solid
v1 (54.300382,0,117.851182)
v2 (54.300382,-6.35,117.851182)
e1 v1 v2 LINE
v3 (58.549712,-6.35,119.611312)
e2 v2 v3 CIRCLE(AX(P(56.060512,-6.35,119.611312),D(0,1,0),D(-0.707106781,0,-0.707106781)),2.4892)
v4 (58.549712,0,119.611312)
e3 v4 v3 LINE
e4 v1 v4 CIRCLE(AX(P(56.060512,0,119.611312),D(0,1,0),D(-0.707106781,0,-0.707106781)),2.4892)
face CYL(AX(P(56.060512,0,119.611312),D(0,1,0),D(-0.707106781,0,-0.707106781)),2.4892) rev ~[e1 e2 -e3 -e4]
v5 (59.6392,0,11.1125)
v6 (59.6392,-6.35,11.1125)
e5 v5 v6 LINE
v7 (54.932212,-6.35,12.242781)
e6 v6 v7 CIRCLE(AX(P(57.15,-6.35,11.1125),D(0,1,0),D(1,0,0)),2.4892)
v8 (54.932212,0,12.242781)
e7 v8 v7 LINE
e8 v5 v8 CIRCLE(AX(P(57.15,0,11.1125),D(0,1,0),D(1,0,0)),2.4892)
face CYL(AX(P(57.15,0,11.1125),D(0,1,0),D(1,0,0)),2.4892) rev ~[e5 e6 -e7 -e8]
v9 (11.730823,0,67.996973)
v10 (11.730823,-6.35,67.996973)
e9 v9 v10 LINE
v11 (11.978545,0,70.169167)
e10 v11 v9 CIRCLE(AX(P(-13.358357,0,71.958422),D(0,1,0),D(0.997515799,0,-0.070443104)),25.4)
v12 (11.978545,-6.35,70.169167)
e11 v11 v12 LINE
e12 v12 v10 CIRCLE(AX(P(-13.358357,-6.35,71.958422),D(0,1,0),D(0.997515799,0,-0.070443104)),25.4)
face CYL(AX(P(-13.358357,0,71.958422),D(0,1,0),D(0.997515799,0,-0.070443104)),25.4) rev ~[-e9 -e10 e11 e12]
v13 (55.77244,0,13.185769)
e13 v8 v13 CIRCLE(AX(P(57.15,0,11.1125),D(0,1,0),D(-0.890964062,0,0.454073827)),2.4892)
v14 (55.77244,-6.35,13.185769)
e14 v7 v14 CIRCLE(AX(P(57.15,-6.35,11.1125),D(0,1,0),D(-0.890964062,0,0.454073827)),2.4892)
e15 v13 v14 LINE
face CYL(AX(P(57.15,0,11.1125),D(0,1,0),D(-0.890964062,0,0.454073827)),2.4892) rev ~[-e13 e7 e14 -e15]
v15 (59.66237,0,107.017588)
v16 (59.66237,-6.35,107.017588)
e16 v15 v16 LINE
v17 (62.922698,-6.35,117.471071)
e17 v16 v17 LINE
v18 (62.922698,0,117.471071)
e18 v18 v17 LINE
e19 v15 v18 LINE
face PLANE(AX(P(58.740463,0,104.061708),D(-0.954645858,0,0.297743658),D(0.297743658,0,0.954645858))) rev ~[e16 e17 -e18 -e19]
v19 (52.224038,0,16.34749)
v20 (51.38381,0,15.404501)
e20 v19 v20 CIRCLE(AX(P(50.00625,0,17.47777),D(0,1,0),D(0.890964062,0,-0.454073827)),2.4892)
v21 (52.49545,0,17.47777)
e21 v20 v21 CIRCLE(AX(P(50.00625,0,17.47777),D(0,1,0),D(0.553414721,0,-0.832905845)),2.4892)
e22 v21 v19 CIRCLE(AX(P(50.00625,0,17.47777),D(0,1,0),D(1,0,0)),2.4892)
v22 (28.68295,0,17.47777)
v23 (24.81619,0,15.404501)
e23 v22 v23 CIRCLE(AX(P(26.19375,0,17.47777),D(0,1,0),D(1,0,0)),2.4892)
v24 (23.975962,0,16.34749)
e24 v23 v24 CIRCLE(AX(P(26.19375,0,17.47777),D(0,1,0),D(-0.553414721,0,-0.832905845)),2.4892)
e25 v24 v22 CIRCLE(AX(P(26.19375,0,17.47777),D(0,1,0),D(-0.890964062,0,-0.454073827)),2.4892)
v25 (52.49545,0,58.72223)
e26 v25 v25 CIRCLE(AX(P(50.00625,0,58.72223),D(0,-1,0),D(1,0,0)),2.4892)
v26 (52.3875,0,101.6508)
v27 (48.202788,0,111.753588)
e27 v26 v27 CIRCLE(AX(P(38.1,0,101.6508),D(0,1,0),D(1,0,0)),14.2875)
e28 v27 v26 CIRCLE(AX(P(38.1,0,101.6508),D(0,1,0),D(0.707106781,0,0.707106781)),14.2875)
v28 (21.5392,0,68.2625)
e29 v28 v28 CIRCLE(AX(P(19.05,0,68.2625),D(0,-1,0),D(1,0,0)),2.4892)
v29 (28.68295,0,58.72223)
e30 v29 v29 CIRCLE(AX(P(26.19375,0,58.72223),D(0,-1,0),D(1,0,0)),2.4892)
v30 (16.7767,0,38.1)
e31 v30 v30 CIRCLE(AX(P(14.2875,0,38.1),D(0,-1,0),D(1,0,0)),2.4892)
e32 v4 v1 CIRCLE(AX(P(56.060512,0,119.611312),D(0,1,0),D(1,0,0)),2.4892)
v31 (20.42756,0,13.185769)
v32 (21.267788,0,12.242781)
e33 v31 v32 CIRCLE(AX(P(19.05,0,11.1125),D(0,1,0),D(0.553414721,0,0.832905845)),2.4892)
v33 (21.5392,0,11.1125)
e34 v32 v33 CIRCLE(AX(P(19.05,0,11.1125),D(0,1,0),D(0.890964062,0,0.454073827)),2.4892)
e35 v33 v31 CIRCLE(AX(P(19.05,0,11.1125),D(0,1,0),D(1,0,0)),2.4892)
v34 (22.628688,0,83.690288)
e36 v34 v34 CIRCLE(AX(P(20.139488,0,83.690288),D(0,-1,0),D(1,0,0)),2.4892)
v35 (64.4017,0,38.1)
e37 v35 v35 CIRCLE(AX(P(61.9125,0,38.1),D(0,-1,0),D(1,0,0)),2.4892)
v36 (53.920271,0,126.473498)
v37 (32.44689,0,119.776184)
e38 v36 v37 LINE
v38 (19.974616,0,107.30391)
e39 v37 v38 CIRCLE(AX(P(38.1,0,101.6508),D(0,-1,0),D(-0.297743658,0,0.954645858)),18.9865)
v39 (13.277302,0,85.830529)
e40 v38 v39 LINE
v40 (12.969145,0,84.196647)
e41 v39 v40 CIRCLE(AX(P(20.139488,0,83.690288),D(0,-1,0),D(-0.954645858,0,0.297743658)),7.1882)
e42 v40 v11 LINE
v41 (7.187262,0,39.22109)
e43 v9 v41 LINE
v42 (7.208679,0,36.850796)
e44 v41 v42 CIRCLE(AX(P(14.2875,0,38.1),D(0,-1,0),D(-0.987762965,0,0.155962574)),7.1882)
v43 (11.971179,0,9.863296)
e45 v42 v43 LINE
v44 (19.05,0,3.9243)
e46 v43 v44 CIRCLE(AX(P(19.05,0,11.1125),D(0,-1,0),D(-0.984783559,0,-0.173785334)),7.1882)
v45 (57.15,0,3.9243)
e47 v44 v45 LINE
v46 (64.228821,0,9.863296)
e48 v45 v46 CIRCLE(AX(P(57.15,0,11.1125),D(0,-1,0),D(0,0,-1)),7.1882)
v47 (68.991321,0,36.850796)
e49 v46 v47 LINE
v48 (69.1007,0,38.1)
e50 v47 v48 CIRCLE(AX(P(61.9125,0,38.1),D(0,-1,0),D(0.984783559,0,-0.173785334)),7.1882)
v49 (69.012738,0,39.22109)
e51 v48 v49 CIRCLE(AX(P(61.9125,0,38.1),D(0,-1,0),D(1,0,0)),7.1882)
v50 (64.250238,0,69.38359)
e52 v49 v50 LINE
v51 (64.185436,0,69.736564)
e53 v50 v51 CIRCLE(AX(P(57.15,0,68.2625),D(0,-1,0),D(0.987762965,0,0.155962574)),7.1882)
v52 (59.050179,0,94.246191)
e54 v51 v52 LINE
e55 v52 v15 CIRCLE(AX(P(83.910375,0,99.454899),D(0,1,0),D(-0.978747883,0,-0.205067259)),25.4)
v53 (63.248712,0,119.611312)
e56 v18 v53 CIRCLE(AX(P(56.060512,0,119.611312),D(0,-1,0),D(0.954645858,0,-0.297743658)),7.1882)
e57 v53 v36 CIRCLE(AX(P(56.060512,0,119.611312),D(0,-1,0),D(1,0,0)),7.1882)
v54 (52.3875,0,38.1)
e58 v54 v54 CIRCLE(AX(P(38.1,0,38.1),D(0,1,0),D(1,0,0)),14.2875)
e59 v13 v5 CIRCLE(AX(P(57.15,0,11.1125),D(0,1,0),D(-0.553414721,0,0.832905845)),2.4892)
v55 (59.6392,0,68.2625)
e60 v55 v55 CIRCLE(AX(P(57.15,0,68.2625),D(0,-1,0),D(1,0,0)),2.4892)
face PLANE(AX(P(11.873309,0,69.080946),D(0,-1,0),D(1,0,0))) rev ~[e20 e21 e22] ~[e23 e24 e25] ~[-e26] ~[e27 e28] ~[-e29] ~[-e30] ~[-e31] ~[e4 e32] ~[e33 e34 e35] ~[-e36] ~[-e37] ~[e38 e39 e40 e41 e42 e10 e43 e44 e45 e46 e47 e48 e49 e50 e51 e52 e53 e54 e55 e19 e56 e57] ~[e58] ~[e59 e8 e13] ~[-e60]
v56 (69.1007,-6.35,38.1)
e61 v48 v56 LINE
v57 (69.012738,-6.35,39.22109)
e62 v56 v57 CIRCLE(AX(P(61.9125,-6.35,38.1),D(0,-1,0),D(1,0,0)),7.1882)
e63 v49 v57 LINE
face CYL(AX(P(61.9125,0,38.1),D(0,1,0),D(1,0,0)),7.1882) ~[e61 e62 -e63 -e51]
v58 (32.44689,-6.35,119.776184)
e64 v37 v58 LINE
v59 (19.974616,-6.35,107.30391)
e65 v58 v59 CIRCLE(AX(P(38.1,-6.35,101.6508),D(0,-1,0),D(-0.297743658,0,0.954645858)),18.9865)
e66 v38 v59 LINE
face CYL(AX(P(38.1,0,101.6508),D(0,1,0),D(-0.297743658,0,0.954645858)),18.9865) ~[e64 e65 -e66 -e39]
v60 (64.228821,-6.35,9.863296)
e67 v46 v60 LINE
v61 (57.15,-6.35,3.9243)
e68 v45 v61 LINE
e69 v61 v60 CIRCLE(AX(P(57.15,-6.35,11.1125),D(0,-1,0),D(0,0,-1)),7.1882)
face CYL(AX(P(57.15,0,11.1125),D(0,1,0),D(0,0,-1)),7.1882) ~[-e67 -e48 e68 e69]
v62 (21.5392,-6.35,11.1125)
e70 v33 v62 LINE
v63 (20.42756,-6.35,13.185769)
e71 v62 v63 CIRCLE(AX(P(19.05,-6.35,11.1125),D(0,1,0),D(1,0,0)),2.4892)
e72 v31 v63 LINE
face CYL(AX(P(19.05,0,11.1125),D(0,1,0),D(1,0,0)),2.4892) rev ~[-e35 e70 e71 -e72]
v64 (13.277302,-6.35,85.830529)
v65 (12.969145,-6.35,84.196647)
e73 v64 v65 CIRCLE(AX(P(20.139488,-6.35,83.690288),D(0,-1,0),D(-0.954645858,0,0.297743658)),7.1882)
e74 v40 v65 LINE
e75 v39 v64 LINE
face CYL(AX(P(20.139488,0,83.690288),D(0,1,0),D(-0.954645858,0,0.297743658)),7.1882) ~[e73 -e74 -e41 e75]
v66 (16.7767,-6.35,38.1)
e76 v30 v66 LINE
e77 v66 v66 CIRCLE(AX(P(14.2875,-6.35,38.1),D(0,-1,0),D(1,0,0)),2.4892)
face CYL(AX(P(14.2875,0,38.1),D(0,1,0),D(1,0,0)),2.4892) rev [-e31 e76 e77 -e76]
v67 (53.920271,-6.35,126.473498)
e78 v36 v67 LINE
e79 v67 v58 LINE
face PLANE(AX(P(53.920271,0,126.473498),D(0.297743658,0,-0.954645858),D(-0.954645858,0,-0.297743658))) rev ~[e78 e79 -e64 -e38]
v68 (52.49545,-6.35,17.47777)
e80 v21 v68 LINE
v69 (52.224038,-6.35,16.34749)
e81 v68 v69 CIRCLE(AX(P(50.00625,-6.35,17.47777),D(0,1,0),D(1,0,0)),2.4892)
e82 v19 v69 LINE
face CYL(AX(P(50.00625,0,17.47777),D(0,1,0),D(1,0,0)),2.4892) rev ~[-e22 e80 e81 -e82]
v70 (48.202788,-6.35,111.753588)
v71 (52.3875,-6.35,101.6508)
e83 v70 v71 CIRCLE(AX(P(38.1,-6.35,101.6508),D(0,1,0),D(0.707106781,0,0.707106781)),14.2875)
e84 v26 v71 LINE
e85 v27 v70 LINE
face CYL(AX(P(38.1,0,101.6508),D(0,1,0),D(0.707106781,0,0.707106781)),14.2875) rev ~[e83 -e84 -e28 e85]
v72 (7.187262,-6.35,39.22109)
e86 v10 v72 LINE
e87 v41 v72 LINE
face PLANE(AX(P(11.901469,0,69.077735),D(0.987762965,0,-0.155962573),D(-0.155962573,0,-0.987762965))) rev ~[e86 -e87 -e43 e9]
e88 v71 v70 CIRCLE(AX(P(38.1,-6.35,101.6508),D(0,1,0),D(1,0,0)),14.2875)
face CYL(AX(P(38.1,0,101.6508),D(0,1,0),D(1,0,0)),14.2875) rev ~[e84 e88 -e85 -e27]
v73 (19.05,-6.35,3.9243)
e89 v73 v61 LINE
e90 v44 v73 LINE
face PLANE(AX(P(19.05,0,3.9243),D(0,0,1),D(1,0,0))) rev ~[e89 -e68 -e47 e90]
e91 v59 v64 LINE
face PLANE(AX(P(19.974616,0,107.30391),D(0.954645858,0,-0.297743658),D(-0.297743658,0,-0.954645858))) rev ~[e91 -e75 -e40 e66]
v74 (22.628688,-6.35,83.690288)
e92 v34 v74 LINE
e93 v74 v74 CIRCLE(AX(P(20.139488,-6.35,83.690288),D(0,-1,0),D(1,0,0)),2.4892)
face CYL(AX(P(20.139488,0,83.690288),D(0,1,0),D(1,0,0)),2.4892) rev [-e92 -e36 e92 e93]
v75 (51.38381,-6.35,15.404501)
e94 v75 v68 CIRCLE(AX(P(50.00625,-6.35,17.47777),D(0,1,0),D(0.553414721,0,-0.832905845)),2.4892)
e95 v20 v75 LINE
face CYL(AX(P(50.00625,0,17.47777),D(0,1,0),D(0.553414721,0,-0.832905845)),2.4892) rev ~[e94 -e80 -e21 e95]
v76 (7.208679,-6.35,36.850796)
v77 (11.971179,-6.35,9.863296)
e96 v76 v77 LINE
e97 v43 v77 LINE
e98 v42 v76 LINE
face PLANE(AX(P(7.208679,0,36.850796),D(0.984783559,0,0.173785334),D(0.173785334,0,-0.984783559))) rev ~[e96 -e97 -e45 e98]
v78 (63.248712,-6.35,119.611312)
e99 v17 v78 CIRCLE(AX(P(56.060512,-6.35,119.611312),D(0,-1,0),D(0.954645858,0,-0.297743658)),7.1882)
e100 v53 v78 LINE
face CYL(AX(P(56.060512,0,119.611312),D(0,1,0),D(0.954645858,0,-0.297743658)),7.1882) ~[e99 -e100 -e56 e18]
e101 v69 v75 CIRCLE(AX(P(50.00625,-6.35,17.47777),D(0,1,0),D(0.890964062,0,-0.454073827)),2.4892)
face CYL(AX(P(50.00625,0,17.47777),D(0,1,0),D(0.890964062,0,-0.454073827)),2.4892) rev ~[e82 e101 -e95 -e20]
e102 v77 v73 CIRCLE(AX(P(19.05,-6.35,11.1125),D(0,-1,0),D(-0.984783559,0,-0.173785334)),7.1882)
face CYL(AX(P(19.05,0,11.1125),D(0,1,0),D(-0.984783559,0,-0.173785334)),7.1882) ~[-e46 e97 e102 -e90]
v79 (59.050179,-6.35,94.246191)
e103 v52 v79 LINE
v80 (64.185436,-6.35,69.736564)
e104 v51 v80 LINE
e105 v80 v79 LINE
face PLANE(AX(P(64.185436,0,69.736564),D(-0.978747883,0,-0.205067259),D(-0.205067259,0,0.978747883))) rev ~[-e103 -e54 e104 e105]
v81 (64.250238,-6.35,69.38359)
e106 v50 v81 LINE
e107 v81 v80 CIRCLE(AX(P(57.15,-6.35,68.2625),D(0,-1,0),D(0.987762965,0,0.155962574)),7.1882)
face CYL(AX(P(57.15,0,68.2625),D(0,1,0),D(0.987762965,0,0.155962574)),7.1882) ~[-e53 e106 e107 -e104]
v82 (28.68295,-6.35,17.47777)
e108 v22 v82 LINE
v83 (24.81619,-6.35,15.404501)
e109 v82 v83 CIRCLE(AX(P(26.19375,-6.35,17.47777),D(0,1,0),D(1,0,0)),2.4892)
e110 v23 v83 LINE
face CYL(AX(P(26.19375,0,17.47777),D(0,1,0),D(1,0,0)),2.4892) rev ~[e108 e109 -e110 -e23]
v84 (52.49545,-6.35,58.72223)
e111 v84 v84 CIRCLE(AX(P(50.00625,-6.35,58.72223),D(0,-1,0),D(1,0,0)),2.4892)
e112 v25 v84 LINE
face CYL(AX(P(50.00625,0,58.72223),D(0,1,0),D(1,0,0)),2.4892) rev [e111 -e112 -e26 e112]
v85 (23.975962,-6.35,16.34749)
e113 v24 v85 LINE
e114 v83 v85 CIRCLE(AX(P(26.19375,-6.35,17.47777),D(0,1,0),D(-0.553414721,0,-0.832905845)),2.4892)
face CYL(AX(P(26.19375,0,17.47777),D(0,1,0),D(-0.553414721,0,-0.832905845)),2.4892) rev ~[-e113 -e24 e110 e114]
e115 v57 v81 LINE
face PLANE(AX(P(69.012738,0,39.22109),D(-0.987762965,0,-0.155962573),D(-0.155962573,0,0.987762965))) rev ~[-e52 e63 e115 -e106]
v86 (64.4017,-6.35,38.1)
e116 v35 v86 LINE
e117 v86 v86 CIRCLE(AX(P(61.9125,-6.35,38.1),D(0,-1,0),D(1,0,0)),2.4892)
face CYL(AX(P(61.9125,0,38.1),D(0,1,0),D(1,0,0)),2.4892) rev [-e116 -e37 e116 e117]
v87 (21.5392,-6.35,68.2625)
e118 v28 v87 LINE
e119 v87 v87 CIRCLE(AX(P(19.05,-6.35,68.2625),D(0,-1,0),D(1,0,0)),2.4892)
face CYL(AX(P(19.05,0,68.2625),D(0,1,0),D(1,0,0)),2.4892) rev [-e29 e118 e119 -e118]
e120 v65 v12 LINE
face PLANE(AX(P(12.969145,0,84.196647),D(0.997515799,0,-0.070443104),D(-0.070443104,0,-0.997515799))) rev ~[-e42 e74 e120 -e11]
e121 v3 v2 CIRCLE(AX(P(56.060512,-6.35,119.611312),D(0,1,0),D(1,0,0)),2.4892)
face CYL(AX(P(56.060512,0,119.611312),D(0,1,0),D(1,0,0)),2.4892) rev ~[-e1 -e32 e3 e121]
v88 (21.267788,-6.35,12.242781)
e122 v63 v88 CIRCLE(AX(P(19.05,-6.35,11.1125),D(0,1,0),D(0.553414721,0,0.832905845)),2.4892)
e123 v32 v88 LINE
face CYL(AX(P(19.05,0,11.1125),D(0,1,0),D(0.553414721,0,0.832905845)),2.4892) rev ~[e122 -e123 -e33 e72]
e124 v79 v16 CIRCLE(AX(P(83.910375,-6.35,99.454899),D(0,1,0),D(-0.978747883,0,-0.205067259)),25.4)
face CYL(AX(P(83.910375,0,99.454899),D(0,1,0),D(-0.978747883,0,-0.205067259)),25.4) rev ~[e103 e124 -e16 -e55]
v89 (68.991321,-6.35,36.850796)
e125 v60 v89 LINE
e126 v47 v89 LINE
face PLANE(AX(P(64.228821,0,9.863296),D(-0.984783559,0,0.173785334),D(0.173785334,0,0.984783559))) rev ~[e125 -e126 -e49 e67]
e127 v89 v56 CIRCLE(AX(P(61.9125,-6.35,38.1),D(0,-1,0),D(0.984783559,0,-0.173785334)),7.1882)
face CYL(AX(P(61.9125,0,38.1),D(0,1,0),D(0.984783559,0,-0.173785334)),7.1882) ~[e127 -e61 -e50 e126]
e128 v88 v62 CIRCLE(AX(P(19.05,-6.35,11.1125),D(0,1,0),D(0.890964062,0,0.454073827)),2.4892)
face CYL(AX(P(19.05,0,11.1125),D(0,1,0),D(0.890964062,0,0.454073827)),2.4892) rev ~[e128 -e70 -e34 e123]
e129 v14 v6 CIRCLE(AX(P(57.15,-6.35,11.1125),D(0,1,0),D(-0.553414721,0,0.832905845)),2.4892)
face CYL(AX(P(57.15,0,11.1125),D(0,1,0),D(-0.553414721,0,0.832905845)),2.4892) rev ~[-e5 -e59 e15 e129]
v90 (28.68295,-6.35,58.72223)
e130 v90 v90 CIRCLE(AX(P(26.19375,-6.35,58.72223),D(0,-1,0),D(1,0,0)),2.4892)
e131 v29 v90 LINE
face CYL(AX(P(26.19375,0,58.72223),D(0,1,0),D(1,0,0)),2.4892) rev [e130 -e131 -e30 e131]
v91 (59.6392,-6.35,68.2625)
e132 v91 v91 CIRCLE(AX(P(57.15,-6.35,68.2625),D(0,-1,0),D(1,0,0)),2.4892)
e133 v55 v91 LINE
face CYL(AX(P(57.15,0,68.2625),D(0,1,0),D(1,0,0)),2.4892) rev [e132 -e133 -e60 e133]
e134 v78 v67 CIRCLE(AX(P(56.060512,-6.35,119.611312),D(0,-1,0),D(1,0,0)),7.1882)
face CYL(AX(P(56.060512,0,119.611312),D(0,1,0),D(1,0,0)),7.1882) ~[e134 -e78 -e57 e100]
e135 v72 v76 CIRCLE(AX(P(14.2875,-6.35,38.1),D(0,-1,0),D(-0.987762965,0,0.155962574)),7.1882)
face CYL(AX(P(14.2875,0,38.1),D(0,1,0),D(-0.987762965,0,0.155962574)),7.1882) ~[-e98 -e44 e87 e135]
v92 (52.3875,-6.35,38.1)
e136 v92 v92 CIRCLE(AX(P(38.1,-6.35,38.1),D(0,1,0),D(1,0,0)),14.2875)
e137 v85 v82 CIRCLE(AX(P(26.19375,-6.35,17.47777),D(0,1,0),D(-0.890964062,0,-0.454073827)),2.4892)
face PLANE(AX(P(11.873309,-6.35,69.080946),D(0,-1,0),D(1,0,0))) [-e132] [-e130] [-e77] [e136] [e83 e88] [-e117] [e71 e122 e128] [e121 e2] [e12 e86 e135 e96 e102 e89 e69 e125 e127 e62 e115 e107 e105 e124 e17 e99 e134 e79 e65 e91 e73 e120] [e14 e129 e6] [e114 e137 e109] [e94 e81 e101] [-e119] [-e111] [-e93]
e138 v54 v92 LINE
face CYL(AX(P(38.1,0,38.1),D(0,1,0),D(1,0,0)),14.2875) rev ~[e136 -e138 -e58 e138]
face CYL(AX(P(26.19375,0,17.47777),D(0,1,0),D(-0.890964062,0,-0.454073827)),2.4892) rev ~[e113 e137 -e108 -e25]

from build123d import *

# Parameters (mm, degrees)
F0_R        = 2.4892
F1_DEPTH    = 6.35
F2_T1_DEPTH = 6.35


# Not quite as in the source:
# - a fillet or chamfer that OpenCascade refuses, or shapes differently, is made with other operations: its cross-section is extruded or revolved along the edge and cut away or added


with BuildPart() as f1:
    # F0 (on Front) → F1 (new body)
    with BuildSketch(Plane.XZ):
        with BuildLine():
            ThreePointArc((13.2773024021, 85.8305287216), (13.0758232734, 85.0225277103), (12.9691446918, 84.1966468751))
            ThreePointArc((12.9691446918, 84.1966468751), (14.0054035794, 79.9428579011), (17.3172773208, 77.0792857545))
            ThreePointArc((17.3172773208, 77.0792857545), (19.6331286406, 76.5199446918), (22.00460406, 76.7482736107))
            ThreePointArc((22.00460406, 76.7482736107), (25.8437426717, 79.3163084348), (27.3276877579, 83.6902877579))
            ThreePointArc((27.3276877579, 83.6902877579), (27.1946025509, 85.0670863985), (26.8002749154, 86.3929038389))
            ThreePointArc((26.8002749154, 86.3929038389), (24.674517099, 88.225317099), (22.8421038389, 90.3510749154))
            ThreePointArc((22.8421038389, 90.3510749154), (17.0679509095, 90.1892015617), (13.2773024021, 85.8305287216))
        make_face()
        with Locations((20.1394877579, 83.6902877579)):
            Circle(F0_R, mode=Mode.SUBTRACT)
        with BuildLine():
            ThreePointArc((26.8002749154, 86.3929038389), (31.0442064849, 84.0240317164), (35.7505, 82.8102312188))
            ThreePointArc((35.7505, 82.8102312188), (38.1, 82.6643), (40.4495, 82.8102312188))
            ThreePointArc((40.4495, 82.8102312188), (42.9672096901, 83.2987578226), (45.3961113108, 84.1221394126))
            ThreePointArc((45.3961113108, 84.1221394126), (47.5091314901, 85.159728875), (49.4775135291, 86.4508207847))
            ThreePointArc((49.4775135291, 86.4508207847), (52.1419442019, 88.8714813453), (54.3015952543, 91.7515326803))
            Line((54.3015952543, 91.7515326803), (54.0915586422, 101.6508))
            Line((54.0915586422, 101.6508), (52.3875, 101.6508))
            ThreePointArc((52.3875, 101.6508), (24.9000711792, 96.1832104601), (48.2027881362, 111.7535881362))
            Line((48.2027881362, 111.7535881362), (50.9776872776, 114.5284872776))
            ThreePointArc((50.9776872776, 114.5284872776), (50.0693141148, 115.6394406129), (49.3997250846, 116.9086961611))
            ThreePointArc((49.3997250846, 116.9086961611), (41.2664943708, 120.3713901523), (32.4468900339, 119.7761835811))
            ThreePointArc((32.4468900339, 119.7761835811), (24.674517099, 115.076282901), (19.9746164189, 107.3039099661))
            ThreePointArc((19.9746164189, 107.3039099661), (19.3794098477, 98.4843056292), (22.8421038389, 90.3510749154))
            ThreePointArc((22.8421038389, 90.3510749154), (25.2223127224, 88.7731127224), (26.8002749154, 86.3929038389))
        make_face()
        with BuildLine():
            ThreePointArc((22.8421038389, 90.3510749154), (24.674517099, 88.225317099), (26.8002749154, 86.3929038389))
            ThreePointArc((26.8002749154, 86.3929038389), (25.2223127224, 88.7731127224), (22.8421038389, 90.3510749154))
        make_face()
        with BuildLine():
            Line((52.3875, 101.6508), (54.0915586422, 101.6508))
            Line((54.0915586422, 101.6508), (53.8671304252, 112.2283602294))
            ThreePointArc((53.8671304252, 112.2283602294), (53.6167151546, 112.5924055979), (53.3578961611, 112.9505250846))
            ThreePointArc((53.3578961611, 112.9505250846), (52.0886406129, 113.6201141148), (50.9776872776, 114.5284872776))
            Line((50.9776872776, 114.5284872776), (48.2027881362, 111.7535881362))
            ThreePointArc((48.2027881362, 111.7535881362), (51.2999288208, 107.1183895399), (52.3875, 101.6508))
        make_face()
        with BuildLine():
            ThreePointArc((51.525482901, 115.076282901), (50.4965080596, 116.03182118), (49.3997250846, 116.9086961611))
            ThreePointArc((49.3997250846, 116.9086961611), (50.0693141148, 115.6394406129), (50.9776872776, 114.5284872776))
            Line((50.9776872776, 114.5284872776), (51.525482901, 115.076282901))
        make_face()
        with BuildLine():
            ThreePointArc((53.3578961611, 112.9505250846), (52.48102118, 114.0473080596), (51.525482901, 115.076282901))
            Line((51.525482901, 115.076282901), (50.9776872776, 114.5284872776))
            ThreePointArc((50.9776872776, 114.5284872776), (52.0886406129, 113.6201141148), (53.3578961611, 112.9505250846))
        make_face()
        with BuildLine():
            ThreePointArc((53.9202712784, 126.4734975979), (49.5615984383, 122.6828490905), (49.3997250846, 116.9086961611))
            ThreePointArc((49.3997250846, 116.9086961611), (50.4965080596, 116.03182118), (51.525482901, 115.076282901))
            ThreePointArc((51.525482901, 115.076282901), (52.48102118, 114.0473080596), (53.3578961611, 112.9505250846))
            ThreePointArc((53.3578961611, 112.9505250846), (53.6051045993, 112.8554856793), (53.8556463568, 112.7696175933))
            ThreePointArc((53.8556463568, 112.7696175933), (56.2129927647, 112.4247296795), (58.5535890214, 112.8692956734))
            ThreePointArc((58.5535890214, 112.8692956734), (61.2734113476, 114.6619787359), (62.9226975979, 117.4710712784))
            ThreePointArc((62.9226975979, 117.4710712784), (63.1667412004, 118.5288478165), (63.2487122421, 119.6113122421))
            ThreePointArc((63.2487122421, 119.6113122421), (60.3199569914, 125.401592863), (53.9202712784, 126.4734975979))
        make_face()
        with BuildLine():
            ThreePointArc((58.5497122421, 119.6113122421), (57.013087842, 117.3115913098), (54.3003820424, 117.8511820424))
            ThreePointArc((54.3003820424, 117.8511820424), (55.1079366423, 121.9110331745), (58.5497122421, 119.6113122421))
        make_face(mode=Mode.SUBTRACT)
        with BuildLine():
            ThreePointArc((22.00460406, 76.7482736107), (19.6331286406, 76.5199446918), (17.3172773208, 77.0792857545))
            Line((17.3172773208, 77.0792857545), (17.1848836978, 75.2045141472))
            ThreePointArc((17.1848836978, 75.2045141472), (19.5563591172, 75.432843066), (21.8722104371, 74.8735020034))
            Line((21.8722104371, 74.8735020034), (22.00460406, 76.7482736107))
        make_face()
        with BuildLine():
            ThreePointArc((11.879656934, 68.7688591172), (12.7603214041, 64.7825341381), (15.6697372294, 61.918680737))
            ThreePointArc((15.6697372294, 61.918680737), (17.4803795527, 61.2477647312), (19.4042866258, 61.0830362159))
            ThreePointArc((19.4042866258, 61.0830362159), (21.8852518822, 64.4761036844), (25.8394633742, 65.9016937117))
            ThreePointArc((25.8394633742, 65.9016937117), (26.1378148913, 67.0653787418), (26.2382, 68.2625))
            ThreePointArc((26.2382, 68.2625), (25.0482010763, 72.2237880592), (21.8722104371, 74.8735020034))
            ThreePointArc((21.8722104371, 74.8735020034), (19.5563591172, 75.432843066), (17.1848836978, 75.2045141472))
            ThreePointArc((17.1848836978, 75.2045141472), (13.7053594795, 73.0692699078), (11.9497622526, 69.3835901706))
            ThreePointArc((11.9497622526, 69.3835901706), (11.9080924989, 69.0769792723), (11.879656934, 68.7688591172))
        make_face()
        with Locations((19.05, 68.2625)):
            Circle(F0_R, mode=Mode.SUBTRACT)
        with BuildLine():
            ThreePointArc((19.4042866258, 61.0830362159), (19.8593939728, 61.1200143937), (20.3112354035, 61.1858126043))
            ThreePointArc((20.3112354035, 61.1858126043), (23.7151175073, 62.7937800508), (25.8394633742, 65.9016937117))
            ThreePointArc((25.8394633742, 65.9016937117), (21.8852518822, 64.4761036844), (19.4042866258, 61.0830362159))
        make_face()
        with BuildLine():
            ThreePointArc((19.5061186901, 56.0867400864), (21.5959350231, 53.1968053577), (24.8175418269, 51.6669999311))
            ThreePointArc((24.8175418269, 51.6669999311), (28.60675, 54.542791329), (32.9918624931, 56.3864461682))
            ThreePointArc((32.9918624931, 56.3864461682), (33.2837574564, 57.5381634141), (33.38195, 58.7222299276))
            ThreePointArc((33.38195, 58.7222299276), (31.1497330567, 63.9288076118), (25.8394633742, 65.9016937117))
            ThreePointArc((25.8394633742, 65.9016937117), (23.7151175073, 62.7937800508), (20.3112354035, 61.1858126043))
            Line((20.3112354035, 61.1858126043), (19.5061186901, 56.0867400864))
        make_face()
        with Locations((26.19375, 58.7222299276)):
            Circle(F0_R, mode=Mode.SUBTRACT)
        with BuildLine():
            ThreePointArc((51.7427044543, 72.9986771632), (50.0943621433, 69.6366155973), (50.3605366258, 65.9016937117))
            ThreePointArc((50.3605366258, 65.9016937117), (54.3147481178, 64.4761036844), (56.7957133742, 61.0830362159))
            ThreePointArc((56.7957133742, 61.0830362159), (58.7196204473, 61.2477647312), (60.5302627706, 61.918680737))
            ThreePointArc((60.5302627706, 61.918680737), (63.3131251848, 64.563026092), (64.3382, 68.2625))
            ThreePointArc((64.3382, 68.2625), (64.3161756961, 68.8247678473), (64.2502377474, 69.3835901706))
            ThreePointArc((64.2502377474, 69.3835901706), (64.2200397807, 69.5604817946), (64.1854355349, 69.7365644741))
            ThreePointArc((64.1854355349, 69.7365644741), (62.4930942353, 73.0709886641), (59.3548658854, 75.1041946488))
            ThreePointArc((59.3548658854, 75.1041946488), (57.6034299499, 75.4363846186), (55.8241066725, 75.3273585353))
            ThreePointArc((55.8241066725, 75.3273585353), (55.2337041191, 75.1905610085), (54.6569232207, 75.0045165687))
            ThreePointArc((54.6569232207, 75.0045165687), (53.0744854744, 74.1836823643), (51.7427044543, 72.9986771632))
        make_face()
        with Locations((57.15, 68.2625)):
            Circle(F0_R, mode=Mode.SUBTRACT)
        with BuildLine():
            ThreePointArc((57.19445, 58.7222299276), (57.0681991156, 57.3809268563), (56.6938813099, 56.0867400864))
            Line((56.6938813099, 56.0867400864), (58.5322372294, 44.443819263))
            ThreePointArc((58.5322372294, 44.443819263), (60.7914098294, 45.2002377474), (63.1737354035, 45.1766873957))
            Line((63.1737354035, 45.1766873957), (60.5302627706, 61.918680737))
            ThreePointArc((60.5302627706, 61.918680737), (58.7196204473, 61.2477647312), (56.7957133742, 61.0830362159))
            ThreePointArc((56.7957133742, 61.0830362159), (57.0940648913, 59.9193511859), (57.19445, 58.7222299276))
        make_face()
        with BuildLine():
            ThreePointArc((57.0865, 38.1), (56.936934824, 35.7215406907), (56.49059568, 33.3805537629))
            ThreePointArc((56.49059568, 33.3805537629), (57.3864626938, 32.5156284558), (58.4181604857, 31.8182955658))
            ThreePointArc((58.4181604857, 31.8182955658), (60.6632962628, 31.0211788225), (63.0456584286, 31.0016782818))
            ThreePointArc((63.0456584286, 31.0016782818), (66.9535512348, 32.9757418402), (68.9913211775, 36.8507962628))
            ThreePointArc((68.9913211775, 36.8507962628), (69.0733030844, 37.4730084323), (69.1007, 38.1))
            ThreePointArc((69.1007, 38.1), (69.0786756961, 38.6622678473), (69.0127377474, 39.2210901706))
            ThreePointArc((69.0127377474, 39.2210901706), (67.0453201693, 43.1323330921), (63.1737354035, 45.1766873957))
            ThreePointArc((63.1737354035, 45.1766873957), (60.7914098294, 45.2002377474), (58.5322372294, 44.443819263))
            ThreePointArc((58.5322372294, 44.443819263), (57.4371024417, 43.7250365275), (56.49059568, 42.8194462371))
            ThreePointArc((56.49059568, 42.8194462371), (56.936934824, 40.4784593093), (57.0865, 38.1))
        make_face()
        with Locations((61.9125, 38.1)):
            Circle(F0_R, mode=Mode.SUBTRACT)
        with BuildLine():
            ThreePointArc((50.3605366258, 65.9016937117), (44.2603204054, 63.0413169069), (43.2081375069, 56.3864461682))
            ThreePointArc((43.2081375069, 56.3864461682), (47.59325, 54.542791329), (51.3824581731, 51.6669999311))
            ThreePointArc((51.3824581731, 51.6669999311), (54.6040649769, 53.1968053577), (56.6938813099, 56.0867400864))
            Line((56.6938813099, 56.0867400864), (55.8887645965, 61.1858126043))
            ThreePointArc((55.8887645965, 61.1858126043), (52.4848824927, 62.7937800508), (50.3605366258, 65.9016937117))
        make_face()
        with Locations((50.00625, 58.7222299276)):
            Circle(F0_R, mode=Mode.SUBTRACT)
        with BuildLine():
            ThreePointArc((19.70940432, 42.8194462371), (21.019659827, 40.6195720477), (21.4757, 38.1))
            ThreePointArc((21.4757, 38.1), (21.019659827, 35.5804279523), (19.70940432, 33.3805537629))
            ThreePointArc((19.70940432, 33.3805537629), (21.657208671, 28.60675), (24.8175418269, 24.5330000689))
            ThreePointArc((24.8175418269, 24.5330000689), (29.78785, 23.7029338799), (32.9918624931, 19.8135538318))
            ThreePointArc((32.9918624931, 19.8135538318), (38.1, 19.1135), (43.2081375069, 19.8135538318))
            ThreePointArc((43.2081375069, 19.8135538318), (46.41215, 23.7029338799), (51.3824581731, 24.5330000689))
            ThreePointArc((51.3824581731, 24.5330000689), (54.542791329, 28.60675), (56.49059568, 33.3805537629))
            ThreePointArc((56.49059568, 33.3805537629), (54.7243, 38.1), (56.49059568, 42.8194462371))
            ThreePointArc((56.49059568, 42.8194462371), (54.542791329, 47.59325), (51.3824581731, 51.6669999311))
            ThreePointArc((51.3824581731, 51.6669999311), (46.41215, 52.4970661201), (43.2081375069, 56.3864461682))
            ThreePointArc((43.2081375069, 56.3864461682), (41.8390977874, 56.7146804965), (40.4495, 56.9405687812))
            ThreePointArc((40.4495, 56.9405687812), (38.1, 57.0865), (35.7505, 56.9405687812))
            ThreePointArc((35.7505, 56.9405687812), (34.3609022126, 56.7146804965), (32.9918624931, 56.3864461682))
            ThreePointArc((32.9918624931, 56.3864461682), (29.78785, 52.4970661201), (24.8175418269, 51.6669999311))
            ThreePointArc((24.8175418269, 51.6669999311), (21.657208671, 47.59325), (19.70940432, 42.8194462371))
        make_face()
        with BuildLine():
            ThreePointArc((23.8125, 38.1), (38.1, 52.3875), (52.3875, 38.1))
            ThreePointArc((52.3875, 38.1), (38.1, 23.8125), (23.8125, 38.1))
        make_face(mode=Mode.SUBTRACT)
        with BuildLine():
            ThreePointArc((56.7957133742, 61.0830362159), (54.3147481178, 64.4761036844), (50.3605366258, 65.9016937117))
            ThreePointArc((50.3605366258, 65.9016937117), (52.4848824927, 62.7937800508), (55.8887645965, 61.1858126043))
            ThreePointArc((55.8887645965, 61.1858126043), (56.3406060272, 61.1200143937), (56.7957133742, 61.0830362159))
        make_face()
        with BuildLine():
            Line((55.8887645965, 61.1858126043), (56.6938813099, 56.0867400864))
            ThreePointArc((56.6938813099, 56.0867400864), (57.0681991156, 57.3809268563), (57.19445, 58.7222299276))
            ThreePointArc((57.19445, 58.7222299276), (57.0940648913, 59.9193511859), (56.7957133742, 61.0830362159))
            ThreePointArc((56.7957133742, 61.0830362159), (56.3406060272, 61.1200143937), (55.8887645965, 61.1858126043))
        make_face()
        with BuildLine():
            ThreePointArc((32.9918624931, 56.3864461682), (28.60675, 54.542791329), (24.8175418269, 51.6669999311))
            ThreePointArc((24.8175418269, 51.6669999311), (29.78785, 52.4970661201), (32.9918624931, 56.3864461682))
        make_face()
        with BuildLine():
            ThreePointArc((13.0262645965, 45.1766873957), (15.4085901706, 45.2002377474), (17.6677627706, 44.443819263))
            Line((17.6677627706, 44.443819263), (19.5061186901, 56.0867400864))
            ThreePointArc((19.5061186901, 56.0867400864), (19.0070425457, 58.5757539709), (19.4042866258, 61.0830362159))
            ThreePointArc((19.4042866258, 61.0830362159), (17.4803795527, 61.2477647312), (15.6697372294, 61.918680737))
            Line((15.6697372294, 61.918680737), (13.0262645965, 45.1766873957))
        make_face()
        with BuildLine():
            ThreePointArc((19.4042866258, 61.0830362159), (19.0070425457, 58.5757539709), (19.5061186901, 56.0867400864))
            Line((19.5061186901, 56.0867400864), (20.3112354035, 61.1858126043))
            ThreePointArc((20.3112354035, 61.1858126043), (19.8593939728, 61.1200143937), (19.4042866258, 61.0830362159))
        make_face()
        with BuildLine():
            ThreePointArc((51.3824581731, 51.6669999311), (47.59325, 54.542791329), (43.2081375069, 56.3864461682))
            ThreePointArc((43.2081375069, 56.3864461682), (46.41215, 52.4970661201), (51.3824581731, 51.6669999311))
        make_face()
        with BuildLine():
            ThreePointArc((56.49059568, 42.8194462371), (54.7243, 38.1), (56.49059568, 33.3805537629))
            ThreePointArc((56.49059568, 33.3805537629), (56.936934824, 35.7215406907), (57.0865, 38.1))
            ThreePointArc((57.0865, 38.1), (56.936934824, 40.4784593093), (56.49059568, 42.8194462371))
        make_face()
        with BuildLine():
            ThreePointArc((19.70940432, 33.3805537629), (19.263065176, 35.7215406907), (19.1135, 38.1))
            ThreePointArc((19.1135, 38.1), (19.263065176, 40.4784593093), (19.70940432, 42.8194462371))
            ThreePointArc((19.70940432, 42.8194462371), (18.7628975583, 43.7250365275), (17.6677627706, 44.443819263))
            ThreePointArc((17.6677627706, 44.443819263), (15.4085901706, 45.2002377474), (13.0262645965, 45.1766873957))
            ThreePointArc((13.0262645965, 45.1766873957), (9.1546798307, 43.1323330921), (7.1872622526, 39.2210901706))
            ThreePointArc((7.1872622526, 39.2210901706), (7.0995933992, 38.0350543392), (7.2086788225, 36.8507962628))
            ThreePointArc((7.2086788225, 36.8507962628), (9.2464487652, 32.9757418402), (13.1543415714, 31.0016782818))
            ThreePointArc((13.1543415714, 31.0016782818), (15.5367037372, 31.0211788225), (17.7818395143, 31.8182955658))
            ThreePointArc((17.7818395143, 31.8182955658), (18.8135373062, 32.5156284558), (19.70940432, 33.3805537629))
        make_face()
        with Locations((14.2875, 38.1)):
            Circle(F0_R, mode=Mode.SUBTRACT)
        with BuildLine():
            Line((19.7502569326, 20.6639301955), (17.7818395143, 31.8182955658))
            ThreePointArc((17.7818395143, 31.8182955658), (15.5367037372, 31.0211788225), (13.1543415714, 31.0016782818))
            Line((13.1543415714, 31.0016782818), (15.5556604857, 17.3942044342))
            ThreePointArc((15.5556604857, 17.3942044342), (17.2463576466, 18.0707392529), (19.0528112327, 18.3006994503))
            ThreePointArc((19.0528112327, 18.3006994503), (19.2995196617, 19.5124217091), (19.7502569326, 20.6639301955))
        make_face()
        with BuildLine():
            ThreePointArc((19.0528112327, 18.3006994503), (17.2463576466, 18.0707392529), (15.5556604857, 17.3942044342))
            ThreePointArc((15.5556604857, 17.3942044342), (12.5595010804, 14.2017787208), (11.9711788225, 9.8632962628))
            ThreePointArc((11.9711788225, 9.8632962628), (14.4298975695, 5.605697591), (19.05, 3.9243))
            ThreePointArc((19.05, 3.9243), (23.2202244148, 5.2576347095), (25.8433842074, 8.763))
            ThreePointArc((25.8433842074, 8.763), (26.0588475271, 9.5167946442), (26.1909387673, 10.2895706221))
            ThreePointArc((26.1909387673, 10.2895706221), (23.542908755, 10.7962088825), (21.2677877423, 12.2427805713))
            ThreePointArc((21.2677877423, 12.2427805713), (21.4703960304, 11.6937053818), (21.5392, 11.1125))
            ThreePointArc((21.5392, 11.1125), (16.8562430855, 9.9362571508), (20.4275599227, 13.1857692298))
            ThreePointArc((20.4275599227, 13.1857692298), (19.2519115156, 15.6120000713), (19.0528112327, 18.3006994503))
        make_face()
        with BuildLine():
            Line((19.1135, 38.1), (21.4757, 38.1))
            ThreePointArc((21.4757, 38.1), (21.019659827, 40.6195720477), (19.70940432, 42.8194462371))
            ThreePointArc((19.70940432, 42.8194462371), (19.263065176, 40.4784593093), (19.1135, 38.1))
        make_face()
        with BuildLine():
            ThreePointArc((32.9918624931, 19.8135538318), (29.78785, 23.7029338799), (24.8175418269, 24.5330000689))
            ThreePointArc((24.8175418269, 24.5330000689), (28.60675, 21.657208671), (32.9918624931, 19.8135538318))
        make_face()
        with BuildLine():
            ThreePointArc((32.9918624931, 19.8135538318), (28.60675, 21.657208671), (24.8175418269, 24.5330000689))
            ThreePointArc((24.8175418269, 24.5330000689), (21.8314848437, 23.1909882501), (19.7502569326, 20.6639301955))
            Line((19.7502569326, 20.6639301955), (20.1831584286, 18.2108217182))
            ThreePointArc((20.1831584286, 18.2108217182), (22.2195800369, 17.5641650277), (23.9759622577, 16.347489501))
            ThreePointArc((23.9759622577, 16.347489501), (25.6125446182, 19.8981661028), (28.68295, 17.4777700724))
            ThreePointArc((28.68295, 17.4777700724), (27.3699928492, 15.2840131579), (24.8161900773, 15.4045008426))
            ThreePointArc((24.8161900773, 15.4045008426), (25.4044515054, 14.4727329243), (25.8433842074, 13.462))
            Line((25.8433842074, 13.462), (32.155612961, 13.462))
            ThreePointArc((32.155612961, 13.462), (33.0685329993, 15.3783468297), (33.38195, 17.4777700724))
            ThreePointArc((33.38195, 17.4777700724), (33.2837574564, 18.6618365859), (32.9918624931, 19.8135538318))
        make_face()
        with BuildLine():
            ThreePointArc((26.1909387673, 10.2895706221), (29.569198328, 11.1313878096), (32.155612961, 13.462))
            Line((32.155612961, 13.462), (25.8433842074, 13.462))
            ThreePointArc((25.8433842074, 13.462), (26.1388089126, 12.3037209871), (26.2382, 11.1125))
            ThreePointArc((26.2382, 11.1125), (26.2263749654, 10.7003573108), (26.1909387673, 10.2895706221))
        make_face()
        with BuildLine():
            Line((20.1831584286, 18.2108217182), (19.7502569326, 20.6639301955))
            ThreePointArc((19.7502569326, 20.6639301955), (19.2995196617, 19.5124217091), (19.0528112327, 18.3006994503))
            ThreePointArc((19.0528112327, 18.3006994503), (19.6197598349, 18.2780839239), (20.1831584286, 18.2108217182))
        make_face()
        with BuildLine():
            ThreePointArc((51.3824581731, 24.5330000689), (46.41215, 23.7029338799), (43.2081375069, 19.8135538318))
            ThreePointArc((43.2081375069, 19.8135538318), (47.59325, 21.657208671), (51.3824581731, 24.5330000689))
        make_face()
        with BuildLine():
            ThreePointArc((51.3838099227, 15.4045008426), (50.7955484946, 14.4727329243), (50.3566157926, 13.462))
            ThreePointArc((50.3566157926, 13.462), (50.004552762, 11.8953173536), (50.0090612327, 10.2895706221))
            ThreePointArc((50.0090612327, 10.2895706221), (52.657091245, 10.7962088825), (54.9322122577, 12.2427805713))
            ThreePointArc((54.9322122577, 12.2427805713), (55.2915226365, 12.7684524538), (55.7724400773, 13.1857692298))
            ThreePointArc((55.7724400773, 13.1857692298), (56.8296929269, 15.2170520751), (57.19445, 17.4777700724))
            ThreePointArc((57.19445, 17.4777700724), (57.1826249654, 17.8899127616), (57.1471887673, 18.3006994503))
            ThreePointArc((57.1471887673, 18.3006994503), (56.5802401651, 18.2780839239), (56.0168415714, 18.2108217182))
            ThreePointArc((56.0168415714, 18.2108217182), (53.9804199631, 17.5641650277), (52.2240377423, 16.347489501))
            ThreePointArc((52.2240377423, 16.347489501), (51.8647273635, 15.8218176185), (51.3838099227, 15.4045008426))
        make_face()
        with BuildLine():
            Line((58.4181604857, 31.8182955658), (56.4497430674, 20.6639301955))
            ThreePointArc((56.4497430674, 20.6639301955), (56.9004803383, 19.5124217091), (57.1471887673, 18.3006994503))
            ThreePointArc((57.1471887673, 18.3006994503), (58.9536423534, 18.0707392529), (60.6443395143, 17.3942044342))
            Line((60.6443395143, 17.3942044342), (63.0456584286, 31.0016782818))
            ThreePointArc((63.0456584286, 31.0016782818), (60.6632962628, 31.0211788225), (58.4181604857, 31.8182955658))
        make_face()
        with BuildLine():
            ThreePointArc((57.1471887673, 18.3006994503), (56.9004803383, 19.5124217091), (56.4497430674, 20.6639301955))
            Line((56.4497430674, 20.6639301955), (56.0168415714, 18.2108217182))
            ThreePointArc((56.0168415714, 18.2108217182), (56.5802401651, 18.2780839239), (57.1471887673, 18.3006994503))
        make_face()
        with BuildLine():
            ThreePointArc((51.3824581731, 24.5330000689), (47.59325, 21.657208671), (43.2081375069, 19.8135538318))
            ThreePointArc((43.2081375069, 19.8135538318), (42.8795535411, 16.5394647794), (44.044387039, 13.462))
            Line((44.044387039, 13.462), (50.3566157926, 13.462))
            ThreePointArc((50.3566157926, 13.462), (50.7955484946, 14.4727329243), (51.3838099227, 15.4045008426))
            ThreePointArc((51.3838099227, 15.4045008426), (47.8124930855, 18.6540129215), (52.49545, 17.4777700724))
            ThreePointArc((52.49545, 17.4777700724), (52.4266460304, 16.8965646905), (52.2240377423, 16.347489501))
            ThreePointArc((52.2240377423, 16.347489501), (53.9804199631, 17.5641650277), (56.0168415714, 18.2108217182))
            Line((56.0168415714, 18.2108217182), (56.4497430674, 20.6639301955))
            ThreePointArc((56.4497430674, 20.6639301955), (54.3685151563, 23.1909882501), (51.3824581731, 24.5330000689))
        make_face()
        with BuildLine():
            Line((50.3566157926, 13.462), (44.044387039, 13.462))
            ThreePointArc((44.044387039, 13.462), (46.630801672, 11.1313878096), (50.0090612327, 10.2895706221))
            ThreePointArc((50.0090612327, 10.2895706221), (50.004552762, 11.8953173536), (50.3566157926, 13.462))
        make_face()
        with BuildLine():
            ThreePointArc((20.1831584286, 18.2108217182), (19.6197598349, 18.2780839239), (19.0528112327, 18.3006994503))
            ThreePointArc((19.0528112327, 18.3006994503), (19.2519115156, 15.6120000713), (20.4275599227, 13.1857692298))
            ThreePointArc((20.4275599227, 13.1857692298), (20.9084773635, 12.7684524538), (21.2677877423, 12.2427805713))
            ThreePointArc((21.2677877423, 12.2427805713), (23.542908755, 10.7962088825), (26.1909387673, 10.2895706221))
            ThreePointArc((26.1909387673, 10.2895706221), (26.2263749654, 10.7003573108), (26.2382, 11.1125))
            ThreePointArc((26.2382, 11.1125), (26.1388089126, 12.3037209871), (25.8433842074, 13.462))
            ThreePointArc((25.8433842074, 13.462), (25.4044515054, 14.4727329243), (24.8161900773, 15.4045008426))
            ThreePointArc((24.8161900773, 15.4045008426), (24.3352726365, 15.8218176185), (23.9759622577, 16.347489501))
            ThreePointArc((23.9759622577, 16.347489501), (22.2195800369, 17.5641650277), (20.1831584286, 18.2108217182))
        make_face()
        with BuildLine():
            ThreePointArc((19.70940432, 33.3805537629), (21.019659827, 35.5804279523), (21.4757, 38.1))
            Line((21.4757, 38.1), (19.1135, 38.1))
            ThreePointArc((19.1135, 38.1), (19.263065176, 35.7215406907), (19.70940432, 33.3805537629))
        make_face()
        with BuildLine():
            ThreePointArc((54.9322122577, 12.2427805713), (52.657091245, 10.7962088825), (50.0090612327, 10.2895706221))
            ThreePointArc((50.0090612327, 10.2895706221), (50.1411524729, 9.5167946442), (50.3566157926, 8.763))
            ThreePointArc((50.3566157926, 8.763), (52.9797755852, 5.2576347095), (57.15, 3.9243))
            ThreePointArc((57.15, 3.9243), (61.7701024305, 5.605697591), (64.2288211775, 9.8632962628))
            ThreePointArc((64.2288211775, 9.8632962628), (64.3108030844, 10.4855084323), (64.3382, 11.1125))
            ThreePointArc((64.3382, 11.1125), (63.3462985135, 14.7561388366), (60.6443395143, 17.3942044342))
            ThreePointArc((60.6443395143, 17.3942044342), (58.9536423534, 18.0707392529), (57.1471887673, 18.3006994503))
            ThreePointArc((57.1471887673, 18.3006994503), (57.1826249654, 17.8899127616), (57.19445, 17.4777700724))
            ThreePointArc((57.19445, 17.4777700724), (56.8296929269, 15.2170520751), (55.7724400773, 13.1857692298))
            ThreePointArc((55.7724400773, 13.1857692298), (58.3262428492, 13.3062569145), (59.6392, 11.1125))
            ThreePointArc((59.6392, 11.1125), (56.5687946182, 8.6921039696), (54.9322122577, 12.2427805713))
        make_face()
        with BuildLine():
            ThreePointArc((50.0090612327, 10.2895706221), (46.630801672, 11.1313878096), (44.044387039, 13.462))
            Line((44.044387039, 13.462), (32.155612961, 13.462))
            ThreePointArc((32.155612961, 13.462), (29.569198328, 11.1313878096), (26.1909387673, 10.2895706221))
            ThreePointArc((26.1909387673, 10.2895706221), (26.0588475271, 9.5167946442), (25.8433842074, 8.763))
            Line((25.8433842074, 8.763), (50.3566157926, 8.763))
            ThreePointArc((50.3566157926, 8.763), (50.1411524729, 9.5167946442), (50.0090612327, 10.2895706221))
        make_face()
        with BuildLine():
            Line((53.8671304252, 112.2283602294), (54.0915586422, 101.6508))
            Line((54.0915586422, 101.6508), (57.0865, 101.6508))
            ThreePointArc((57.0865, 101.6508), (56.9853547603, 103.6079810923), (56.6829966868, 105.5443095208))
            ThreePointArc((56.6829966868, 105.5443095208), (55.5971981077, 109.0220441711), (53.8671304252, 112.2283602294))
        make_face()
        with BuildLine():
            ThreePointArc((53.3578961611, 112.9505250846), (53.6167151546, 112.5924055979), (53.8671304252, 112.2283602294))
            Line((53.8671304252, 112.2283602294), (53.8556463568, 112.7696175933))
            ThreePointArc((53.8556463568, 112.7696175933), (53.6051045993, 112.8554856793), (53.3578961611, 112.9505250846))
        make_face()
        with BuildLine():
            Line((35.7505, 82.8102312188), (35.7505, 56.9405687812))
            ThreePointArc((35.7505, 56.9405687812), (38.1, 57.0865), (40.4495, 56.9405687812))
            Line((40.4495, 56.9405687812), (40.4495, 82.8102312188))
            ThreePointArc((40.4495, 82.8102312188), (38.1, 82.6643), (35.7505, 82.8102312188))
        make_face()
        with BuildLine():
            ThreePointArc((49.4775135291, 86.4508207847), (47.5091314901, 85.159728875), (45.3961113108, 84.1221394126))
            Line((45.3961113108, 84.1221394126), (51.7427044543, 72.9986771632))
            ThreePointArc((51.7427044543, 72.9986771632), (53.0744854744, 74.1836823643), (54.6569232207, 75.0045165687))
            Line((54.6569232207, 75.0045165687), (54.60472832, 77.4645223279))
            Line((54.60472832, 77.4645223279), (49.4775135291, 86.4508207847))
        make_face()
        with BuildLine():
            Line((54.60472832, 77.4645223279), (54.6569232207, 75.0045165687))
            ThreePointArc((54.6569232207, 75.0045165687), (55.2337041191, 75.1905610085), (55.8241066725, 75.3273585353))
            Line((55.8241066725, 75.3273585353), (54.60472832, 77.4645223279))
        make_face()
        with BuildLine():
            Line((54.0915586422, 101.6508), (54.3015952543, 91.7515326803))
            ThreePointArc((54.3015952543, 91.7515326803), (55.3943005658, 93.8153453105), (56.2253835811, 95.9976900339))
            ThreePointArc((56.2253835811, 95.9976900339), (56.8699863827, 98.7916404305), (57.0865, 101.6508))
            Line((57.0865, 101.6508), (54.0915586422, 101.6508))
        make_face()
        with BuildLine():
            Line((53.9202712784, 126.4734975979), (32.4468900339, 119.7761835811))
            ThreePointArc((32.4468900339, 119.7761835811), (41.2664943708, 120.3713901523), (49.3997250846, 116.9086961611))
            ThreePointArc((49.3997250846, 116.9086961611), (49.5615984383, 122.6828490905), (53.9202712784, 126.4734975979))
        make_face()
        with BuildLine():
            Line((19.9746164189, 107.3039099661), (13.2773024021, 85.8305287216))
            ThreePointArc((13.2773024021, 85.8305287216), (17.0679509095, 90.1892015617), (22.8421038389, 90.3510749154))
            ThreePointArc((22.8421038389, 90.3510749154), (19.3794098477, 98.4843056292), (19.9746164189, 107.3039099661))
        make_face()
        with BuildLine():
            Line((12.9691446918, 84.1966468751), (11.9014692679, 69.0777346006))
            Line((11.9014692679, 69.0777346006), (11.9497622526, 69.3835901706))
            ThreePointArc((11.9497622526, 69.3835901706), (13.7053594795, 73.0692699078), (17.1848836978, 75.2045141472))
            Line((17.1848836978, 75.2045141472), (17.3172773208, 77.0792857545))
            ThreePointArc((17.3172773208, 77.0792857545), (14.0054035794, 79.9428579011), (12.9691446918, 84.1966468751))
        make_face()
        with BuildLine():
            ThreePointArc((7.1872622526, 39.2210901706), (9.1546798307, 43.1323330921), (13.0262645965, 45.1766873957))
            Line((13.0262645965, 45.1766873957), (15.6697372294, 61.918680737))
            ThreePointArc((15.6697372294, 61.918680737), (12.7603214041, 64.7825341381), (11.879656934, 68.7688591172))
            Line((11.879656934, 68.7688591172), (11.9014692679, 69.0777346006))
            Line((11.9014692679, 69.0777346006), (7.1872622526, 39.2210901706))
        make_face()
        with BuildLine():
            ThreePointArc((25.8433842074, 8.763), (23.2202244148, 5.2576347095), (19.05, 3.9243))
            Line((19.05, 3.9243), (57.15, 3.9243))
            ThreePointArc((57.15, 3.9243), (52.9797755852, 5.2576347095), (50.3566157926, 8.763))
            Line((50.3566157926, 8.763), (25.8433842074, 8.763))
        make_face()
        with BuildLine():
            ThreePointArc((64.3382, 11.1125), (64.3108030844, 10.4855084323), (64.2288211775, 9.8632962628))
            Line((64.2288211775, 9.8632962628), (68.9913211775, 36.8507962628))
            ThreePointArc((68.9913211775, 36.8507962628), (66.9535512348, 32.9757418402), (63.0456584286, 31.0016782818))
            Line((63.0456584286, 31.0016782818), (60.6443395143, 17.3942044342))
            ThreePointArc((60.6443395143, 17.3942044342), (63.3462985135, 14.7561388366), (64.3382, 11.1125))
        make_face()
        with BuildLine():
            ThreePointArc((64.3382, 68.2625), (63.3131251848, 64.563026092), (60.5302627706, 61.918680737))
            Line((60.5302627706, 61.918680737), (63.1737354035, 45.1766873957))
            ThreePointArc((63.1737354035, 45.1766873957), (67.0453201693, 43.1323330921), (69.0127377474, 39.2210901706))
            Line((69.0127377474, 39.2210901706), (64.2502377474, 69.3835901706))
            ThreePointArc((64.2502377474, 69.3835901706), (64.3161756961, 68.8247678473), (64.3382, 68.2625))
        make_face()
        with BuildLine():
            Line((58.9372909435, 94.7849823688), (59.3548658854, 75.1041946488))
            ThreePointArc((59.3548658854, 75.1041946488), (62.4930942353, 73.0709886641), (64.1854355349, 69.7365644741))
            Line((64.1854355349, 69.7365644741), (58.9372909435, 94.7849823688))
        make_face()
        with BuildLine():
            Line((58.7404630424, 104.0617079368), (62.9226975979, 117.4710712784))
            ThreePointArc((62.9226975979, 117.4710712784), (61.2734113476, 114.6619787359), (58.5535890214, 112.8692956734))
            Line((58.5535890214, 112.8692956734), (58.7404630424, 104.0617079368))
        make_face()
        with BuildLine():
            Line((53.8556463568, 112.7696175933), (53.8671304252, 112.2283602294))
            ThreePointArc((53.8671304252, 112.2283602294), (55.5971981077, 109.0220441711), (56.6829966868, 105.5443095208))
            Line((56.6829966868, 105.5443095208), (57.4987648131, 101.6508))
            Line((57.4987648131, 101.6508), (57.9885270834, 101.6508))
            Line((57.9885270834, 101.6508), (58.7404630424, 104.0617079368))
            Line((58.7404630424, 104.0617079368), (58.5535890214, 112.8692956734))
            ThreePointArc((58.5535890214, 112.8692956734), (56.2129927647, 112.4247296795), (53.8556463568, 112.7696175933))
        make_face()
        with BuildLine():
            ThreePointArc((56.2253835811, 95.9976900339), (55.3943005658, 93.8153453105), (54.3015952543, 91.7515326803))
            Line((54.3015952543, 91.7515326803), (54.60472832, 77.4645223279))
            Line((54.60472832, 77.4645223279), (55.8241066725, 75.3273585353))
            ThreePointArc((55.8241066725, 75.3273585353), (57.6034299499, 75.4363846186), (59.3548658854, 75.1041946488))
            Line((59.3548658854, 75.1041946488), (58.9372909435, 94.7849823688))
            Line((58.9372909435, 94.7849823688), (57.6955680286, 100.711494861))
            Line((57.6955680286, 100.711494861), (56.2253835811, 95.9976900339))
        make_face()
        with BuildLine():
            ThreePointArc((54.3015952543, 91.7515326803), (52.1419442019, 88.8714813453), (49.4775135291, 86.4508207847))
            Line((49.4775135291, 86.4508207847), (54.60472832, 77.4645223279))
            Line((54.60472832, 77.4645223279), (54.3015952543, 91.7515326803))
        make_face()
        with BuildLine():
            Line((40.4495, 82.8102312188), (40.4495, 56.9405687812))
            ThreePointArc((40.4495, 56.9405687812), (41.8390977874, 56.7146804965), (43.2081375069, 56.3864461682))
            ThreePointArc((43.2081375069, 56.3864461682), (44.2603204054, 63.0413169069), (50.3605366258, 65.9016937117))
            ThreePointArc((50.3605366258, 65.9016937117), (50.0943621433, 69.6366155973), (51.7427044543, 72.9986771632))
            Line((51.7427044543, 72.9986771632), (45.3961113108, 84.1221394126))
            ThreePointArc((45.3961113108, 84.1221394126), (42.9672096901, 83.2987578226), (40.4495, 82.8102312188))
        make_face()
        with BuildLine():
            ThreePointArc((33.38195, 58.7222299276), (33.2837574564, 57.5381634141), (32.9918624931, 56.3864461682))
            ThreePointArc((32.9918624931, 56.3864461682), (34.3609022126, 56.7146804965), (35.7505, 56.9405687812))
            Line((35.7505, 56.9405687812), (35.7505, 82.8102312188))
            ThreePointArc((35.7505, 82.8102312188), (31.0442064849, 84.0240317164), (26.8002749154, 86.3929038389))
            ThreePointArc((26.8002749154, 86.3929038389), (27.1946025509, 85.0670863985), (27.3276877579, 83.6902877579))
            ThreePointArc((27.3276877579, 83.6902877579), (25.8437426717, 79.3163084348), (22.00460406, 76.7482736107))
            Line((22.00460406, 76.7482736107), (21.8722104371, 74.8735020034))
            ThreePointArc((21.8722104371, 74.8735020034), (25.0482010763, 72.2237880592), (26.2382, 68.2625))
            ThreePointArc((26.2382, 68.2625), (26.1378148913, 67.0653787418), (25.8394633742, 65.9016937117))
            ThreePointArc((25.8394633742, 65.9016937117), (31.1497330567, 63.9288076118), (33.38195, 58.7222299276))
        make_face()
        with BuildLine():
            ThreePointArc((17.6677627706, 44.443819263), (18.7628975583, 43.7250365275), (19.70940432, 42.8194462371))
            ThreePointArc((19.70940432, 42.8194462371), (21.657208671, 47.59325), (24.8175418269, 51.6669999311))
            ThreePointArc((24.8175418269, 51.6669999311), (21.5959350231, 53.1968053577), (19.5061186901, 56.0867400864))
            Line((19.5061186901, 56.0867400864), (17.6677627706, 44.443819263))
        make_face()
        with BuildLine():
            ThreePointArc((56.6938813099, 56.0867400864), (54.6040649769, 53.1968053577), (51.3824581731, 51.6669999311))
            ThreePointArc((51.3824581731, 51.6669999311), (54.542791329, 47.59325), (56.49059568, 42.8194462371))
            ThreePointArc((56.49059568, 42.8194462371), (57.4371024417, 43.7250365275), (58.5322372294, 44.443819263))
            Line((58.5322372294, 44.443819263), (56.6938813099, 56.0867400864))
        make_face()
        with BuildLine():
            ThreePointArc((56.49059568, 33.3805537629), (54.542791329, 28.60675), (51.3824581731, 24.5330000689))
            ThreePointArc((51.3824581731, 24.5330000689), (54.3685151563, 23.1909882501), (56.4497430674, 20.6639301955))
            Line((56.4497430674, 20.6639301955), (58.4181604857, 31.8182955658))
            ThreePointArc((58.4181604857, 31.8182955658), (57.3864626938, 32.5156284558), (56.49059568, 33.3805537629))
        make_face()
        with BuildLine():
            ThreePointArc((43.2081375069, 19.8135538318), (38.1, 19.1135), (32.9918624931, 19.8135538318))
            ThreePointArc((32.9918624931, 19.8135538318), (33.2837574564, 18.6618365859), (33.38195, 17.4777700724))
            ThreePointArc((33.38195, 17.4777700724), (33.0685329993, 15.3783468297), (32.155612961, 13.462))
            Line((32.155612961, 13.462), (44.044387039, 13.462))
            ThreePointArc((44.044387039, 13.462), (42.8795535411, 16.5394647794), (43.2081375069, 19.8135538318))
        make_face()
        with BuildLine():
            ThreePointArc((24.8175418269, 24.5330000689), (21.657208671, 28.60675), (19.70940432, 33.3805537629))
            ThreePointArc((19.70940432, 33.3805537629), (18.8135373062, 32.5156284558), (17.7818395143, 31.8182955658))
            Line((17.7818395143, 31.8182955658), (19.7502569326, 20.6639301955))
            ThreePointArc((19.7502569326, 20.6639301955), (21.8314848437, 23.1909882501), (24.8175418269, 24.5330000689))
        make_face()
        Polygon((57.4987648131, 101.6508), (57.6955680286, 100.711494861), (57.9885270834, 101.6508), align=None)
        with BuildLine():
            ThreePointArc((57.0865, 101.6508), (56.8699863827, 98.7916404305), (56.2253835811, 95.9976900339))
            Line((56.2253835811, 95.9976900339), (57.6955680286, 100.711494861))
            Line((57.6955680286, 100.711494861), (57.4987648131, 101.6508))
            Line((57.4987648131, 101.6508), (57.0865, 101.6508))
        make_face()
        with BuildLine():
            ThreePointArc((56.6829966868, 105.5443095208), (56.9853547603, 103.6079810923), (57.0865, 101.6508))
            Line((57.0865, 101.6508), (57.4987648131, 101.6508))
            Line((57.4987648131, 101.6508), (56.6829966868, 105.5443095208))
        make_face()
        with BuildLine():
            Line((15.5556604857, 17.3942044342), (13.1543415714, 31.0016782818))
            ThreePointArc((13.1543415714, 31.0016782818), (9.2464487652, 32.9757418402), (7.2086788225, 36.8507962628))
            Line((7.2086788225, 36.8507962628), (11.9711788225, 9.8632962628))
            ThreePointArc((11.9711788225, 9.8632962628), (12.5595010804, 14.2017787208), (15.5556604857, 17.3942044342))
        make_face()
        with BuildLine():
            Line((11.9497622526, 69.3835901706), (11.9014692679, 69.0777346006))
            Line((11.9014692679, 69.0777346006), (11.879656934, 68.7688591172))
            ThreePointArc((11.879656934, 68.7688591172), (11.9080924989, 69.0769792723), (11.9497622526, 69.3835901706))
        make_face()
    extrude(amount=F1_DEPTH)

    # F2: fillet of radius 25.4 on 17 edges, made by hand

    # F2_s2 → F2_t1 (join)
    with BuildSketch(Plane.XZ):
        with BuildLine():
            ThreePointArc((11.9785446527, 70.1691674039), (11.8780656248, 69.0804036049), (11.7308226787, 67.9969728689))
            Line((11.7308226787, 67.9969728689), (11.9014692679, 69.0777346006))
            Line((11.9014692679, 69.0777346006), (11.9785446527, 70.1691674039))
        make_face()
        with BuildLine():
            ThreePointArc((59.0501785193, 94.2461909684), (58.5395056472, 100.6710410737), (59.6623699651, 107.0175882752))
            Line((59.6623699651, 107.0175882752), (57.6955680286, 100.711494861))
            Line((57.6955680286, 100.711494861), (59.0501785193, 94.2461909684))
        make_face()
    extrude(amount=F2_T1_DEPTH)


solid = f1.part
